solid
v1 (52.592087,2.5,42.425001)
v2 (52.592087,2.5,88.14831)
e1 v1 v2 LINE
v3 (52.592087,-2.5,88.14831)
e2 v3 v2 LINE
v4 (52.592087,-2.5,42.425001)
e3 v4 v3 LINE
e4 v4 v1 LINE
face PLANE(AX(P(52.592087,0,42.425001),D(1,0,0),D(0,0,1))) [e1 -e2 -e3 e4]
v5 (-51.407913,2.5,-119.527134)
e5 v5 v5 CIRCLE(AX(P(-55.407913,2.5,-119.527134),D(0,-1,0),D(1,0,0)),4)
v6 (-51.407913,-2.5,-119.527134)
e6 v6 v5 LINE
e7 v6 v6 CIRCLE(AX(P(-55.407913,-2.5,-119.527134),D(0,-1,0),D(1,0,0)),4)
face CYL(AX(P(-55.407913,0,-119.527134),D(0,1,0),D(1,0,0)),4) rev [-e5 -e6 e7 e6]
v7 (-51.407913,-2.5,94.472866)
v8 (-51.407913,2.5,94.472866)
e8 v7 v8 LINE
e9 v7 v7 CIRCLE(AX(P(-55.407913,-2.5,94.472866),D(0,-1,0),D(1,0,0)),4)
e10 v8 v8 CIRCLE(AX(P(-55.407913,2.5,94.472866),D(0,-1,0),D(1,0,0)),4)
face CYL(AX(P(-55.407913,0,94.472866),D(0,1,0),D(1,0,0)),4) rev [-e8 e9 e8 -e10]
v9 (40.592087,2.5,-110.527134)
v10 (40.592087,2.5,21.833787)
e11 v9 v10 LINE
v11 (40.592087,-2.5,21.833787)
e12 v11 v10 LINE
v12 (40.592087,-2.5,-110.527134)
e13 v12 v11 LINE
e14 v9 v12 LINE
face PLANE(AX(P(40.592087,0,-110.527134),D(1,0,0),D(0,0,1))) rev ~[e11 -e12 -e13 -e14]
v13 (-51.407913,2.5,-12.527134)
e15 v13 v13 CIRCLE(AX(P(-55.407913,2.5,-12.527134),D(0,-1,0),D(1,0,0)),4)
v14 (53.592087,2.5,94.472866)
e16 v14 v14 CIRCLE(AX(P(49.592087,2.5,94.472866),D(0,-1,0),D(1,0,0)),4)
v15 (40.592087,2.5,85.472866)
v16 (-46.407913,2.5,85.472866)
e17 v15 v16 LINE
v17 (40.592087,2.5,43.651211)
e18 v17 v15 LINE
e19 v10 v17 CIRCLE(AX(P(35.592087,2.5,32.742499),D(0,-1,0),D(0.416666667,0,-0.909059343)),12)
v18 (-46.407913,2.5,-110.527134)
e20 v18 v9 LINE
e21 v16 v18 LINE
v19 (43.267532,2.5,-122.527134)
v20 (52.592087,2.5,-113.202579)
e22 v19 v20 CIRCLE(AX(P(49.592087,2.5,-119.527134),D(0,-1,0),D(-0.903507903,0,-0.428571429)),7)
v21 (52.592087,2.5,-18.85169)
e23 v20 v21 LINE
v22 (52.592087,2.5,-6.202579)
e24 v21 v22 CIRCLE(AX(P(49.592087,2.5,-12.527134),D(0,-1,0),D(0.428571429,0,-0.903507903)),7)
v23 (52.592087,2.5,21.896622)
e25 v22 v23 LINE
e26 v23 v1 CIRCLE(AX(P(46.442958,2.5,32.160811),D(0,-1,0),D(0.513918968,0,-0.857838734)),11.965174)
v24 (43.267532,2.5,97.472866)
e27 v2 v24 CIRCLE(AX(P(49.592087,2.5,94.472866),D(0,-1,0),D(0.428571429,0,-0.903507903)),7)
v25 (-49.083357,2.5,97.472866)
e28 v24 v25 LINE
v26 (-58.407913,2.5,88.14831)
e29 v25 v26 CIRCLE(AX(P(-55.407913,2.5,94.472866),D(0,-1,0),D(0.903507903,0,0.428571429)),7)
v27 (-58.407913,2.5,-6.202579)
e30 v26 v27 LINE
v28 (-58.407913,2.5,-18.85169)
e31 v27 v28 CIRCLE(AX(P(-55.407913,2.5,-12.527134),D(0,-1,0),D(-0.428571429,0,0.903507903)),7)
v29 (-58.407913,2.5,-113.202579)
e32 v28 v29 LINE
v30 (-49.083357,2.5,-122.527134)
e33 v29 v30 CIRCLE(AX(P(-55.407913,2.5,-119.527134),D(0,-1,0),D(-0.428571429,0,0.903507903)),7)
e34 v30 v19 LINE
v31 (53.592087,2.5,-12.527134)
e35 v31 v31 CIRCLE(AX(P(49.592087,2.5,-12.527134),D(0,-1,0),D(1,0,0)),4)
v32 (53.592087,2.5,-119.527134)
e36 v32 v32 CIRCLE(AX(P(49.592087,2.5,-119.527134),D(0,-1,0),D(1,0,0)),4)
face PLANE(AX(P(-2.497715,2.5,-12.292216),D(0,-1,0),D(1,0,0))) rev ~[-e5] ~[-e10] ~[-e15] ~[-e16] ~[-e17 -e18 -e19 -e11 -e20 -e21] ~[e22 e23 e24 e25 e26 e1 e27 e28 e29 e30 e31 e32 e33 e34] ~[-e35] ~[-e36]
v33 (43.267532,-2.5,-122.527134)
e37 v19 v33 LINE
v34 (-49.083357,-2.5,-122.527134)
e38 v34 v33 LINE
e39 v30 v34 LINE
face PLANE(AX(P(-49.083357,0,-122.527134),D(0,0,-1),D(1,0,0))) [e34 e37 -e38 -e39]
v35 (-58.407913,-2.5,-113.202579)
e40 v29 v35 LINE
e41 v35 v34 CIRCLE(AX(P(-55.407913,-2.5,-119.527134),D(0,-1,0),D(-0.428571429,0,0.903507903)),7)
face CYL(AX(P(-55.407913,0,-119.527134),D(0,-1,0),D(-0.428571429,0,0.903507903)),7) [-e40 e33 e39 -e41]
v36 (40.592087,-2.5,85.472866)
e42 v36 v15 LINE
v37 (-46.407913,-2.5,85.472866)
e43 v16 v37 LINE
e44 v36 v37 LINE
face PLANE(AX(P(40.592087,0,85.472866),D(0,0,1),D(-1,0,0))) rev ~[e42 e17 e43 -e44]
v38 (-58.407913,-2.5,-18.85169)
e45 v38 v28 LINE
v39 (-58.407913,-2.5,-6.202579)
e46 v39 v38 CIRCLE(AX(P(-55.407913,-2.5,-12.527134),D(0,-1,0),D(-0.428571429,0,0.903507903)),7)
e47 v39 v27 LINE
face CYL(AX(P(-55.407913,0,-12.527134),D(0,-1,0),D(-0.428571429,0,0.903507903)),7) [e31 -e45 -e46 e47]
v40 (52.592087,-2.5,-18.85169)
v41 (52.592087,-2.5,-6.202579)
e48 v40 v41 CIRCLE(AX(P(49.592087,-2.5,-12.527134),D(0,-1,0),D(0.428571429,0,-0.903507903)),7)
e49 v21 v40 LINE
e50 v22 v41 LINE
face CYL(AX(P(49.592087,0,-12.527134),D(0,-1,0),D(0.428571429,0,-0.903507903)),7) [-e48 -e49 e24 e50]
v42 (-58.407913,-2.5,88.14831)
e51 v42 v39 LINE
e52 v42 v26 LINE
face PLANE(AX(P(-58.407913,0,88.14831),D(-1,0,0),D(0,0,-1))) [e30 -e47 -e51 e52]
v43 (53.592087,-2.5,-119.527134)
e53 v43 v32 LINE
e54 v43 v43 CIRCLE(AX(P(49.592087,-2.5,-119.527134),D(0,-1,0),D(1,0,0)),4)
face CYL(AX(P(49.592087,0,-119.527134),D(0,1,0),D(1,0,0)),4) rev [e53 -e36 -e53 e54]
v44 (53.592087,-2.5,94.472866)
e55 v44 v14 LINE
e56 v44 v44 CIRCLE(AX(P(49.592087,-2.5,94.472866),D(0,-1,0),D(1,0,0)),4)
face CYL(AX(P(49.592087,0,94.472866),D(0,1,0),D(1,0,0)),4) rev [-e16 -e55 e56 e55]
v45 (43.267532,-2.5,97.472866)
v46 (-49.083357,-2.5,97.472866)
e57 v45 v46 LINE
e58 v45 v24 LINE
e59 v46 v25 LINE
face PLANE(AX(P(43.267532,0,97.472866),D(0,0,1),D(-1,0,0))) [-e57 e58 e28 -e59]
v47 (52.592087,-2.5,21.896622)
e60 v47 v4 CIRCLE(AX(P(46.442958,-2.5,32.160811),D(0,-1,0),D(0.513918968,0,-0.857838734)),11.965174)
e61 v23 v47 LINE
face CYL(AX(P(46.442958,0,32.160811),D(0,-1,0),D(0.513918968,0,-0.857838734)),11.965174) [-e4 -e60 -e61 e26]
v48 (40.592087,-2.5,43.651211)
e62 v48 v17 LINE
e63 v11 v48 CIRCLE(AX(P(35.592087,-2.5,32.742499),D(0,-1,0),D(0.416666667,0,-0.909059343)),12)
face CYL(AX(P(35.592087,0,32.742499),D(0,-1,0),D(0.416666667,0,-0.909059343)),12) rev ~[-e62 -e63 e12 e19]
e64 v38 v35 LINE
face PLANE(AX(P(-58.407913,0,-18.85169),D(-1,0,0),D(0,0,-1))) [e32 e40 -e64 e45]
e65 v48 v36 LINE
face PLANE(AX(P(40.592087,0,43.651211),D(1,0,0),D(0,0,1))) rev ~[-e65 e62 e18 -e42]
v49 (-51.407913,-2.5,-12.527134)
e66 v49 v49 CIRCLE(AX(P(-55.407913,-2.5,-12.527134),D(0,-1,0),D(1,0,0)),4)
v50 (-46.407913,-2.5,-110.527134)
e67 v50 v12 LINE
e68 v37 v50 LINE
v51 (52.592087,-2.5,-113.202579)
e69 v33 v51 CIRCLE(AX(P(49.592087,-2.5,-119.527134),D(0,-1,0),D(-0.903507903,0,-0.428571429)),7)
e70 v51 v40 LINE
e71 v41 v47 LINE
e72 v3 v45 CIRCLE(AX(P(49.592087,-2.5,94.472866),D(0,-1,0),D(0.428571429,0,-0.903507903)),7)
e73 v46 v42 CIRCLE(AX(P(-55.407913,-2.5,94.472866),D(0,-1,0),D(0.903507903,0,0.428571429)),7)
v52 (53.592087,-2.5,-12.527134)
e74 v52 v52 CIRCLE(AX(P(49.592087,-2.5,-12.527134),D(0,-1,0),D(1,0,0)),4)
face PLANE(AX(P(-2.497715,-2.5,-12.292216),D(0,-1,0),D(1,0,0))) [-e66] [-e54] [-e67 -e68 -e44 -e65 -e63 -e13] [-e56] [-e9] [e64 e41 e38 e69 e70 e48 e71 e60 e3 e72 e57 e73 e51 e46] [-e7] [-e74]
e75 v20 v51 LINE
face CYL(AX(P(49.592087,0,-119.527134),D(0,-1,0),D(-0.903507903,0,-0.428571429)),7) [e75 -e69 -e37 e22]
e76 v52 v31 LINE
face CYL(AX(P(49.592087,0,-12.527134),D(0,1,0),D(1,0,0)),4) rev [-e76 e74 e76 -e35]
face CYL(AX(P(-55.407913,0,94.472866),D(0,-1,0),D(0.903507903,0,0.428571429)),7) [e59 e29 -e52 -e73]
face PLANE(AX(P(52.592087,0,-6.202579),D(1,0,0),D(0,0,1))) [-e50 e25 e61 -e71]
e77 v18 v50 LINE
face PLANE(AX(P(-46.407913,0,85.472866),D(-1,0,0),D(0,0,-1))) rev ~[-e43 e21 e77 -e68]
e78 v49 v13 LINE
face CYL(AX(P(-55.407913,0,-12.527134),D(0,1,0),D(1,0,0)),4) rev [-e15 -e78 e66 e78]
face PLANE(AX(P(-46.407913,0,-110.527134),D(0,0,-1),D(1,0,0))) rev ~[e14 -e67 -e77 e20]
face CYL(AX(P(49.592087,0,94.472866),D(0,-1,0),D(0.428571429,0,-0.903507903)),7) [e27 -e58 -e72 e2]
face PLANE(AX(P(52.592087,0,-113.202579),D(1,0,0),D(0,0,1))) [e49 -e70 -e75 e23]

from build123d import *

# Parameters (mm, degrees)
F0_R     = 4
F1_DEPTH = 2.5
F3_DEPTH = 5


# Not quite as in the source:
# - a feature names something its author has since deleted; it is built from what else it names


with BuildPart() as f1:
    # F0 (on Front) → F1 (new body, symmetric)
    with BuildSketch(Plane.XZ):
        with BuildLine():
            Line((-58.4079127312, -18.8516896643), (-58.4079127312, -113.2025790236))
            ThreePointArc((-58.4079127312, -113.2025790236), (-60.3576601995, -124.4768818123), (-49.0833574108, -122.527134344))
            Line((-49.0833574108, -122.527134344), (43.2675319485, -122.527134344))
            ThreePointArc((43.2675319485, -122.527134344), (54.5418347371, -124.4768818123), (52.5920872688, -113.2025790236))
            Line((52.5920872688, -113.2025790236), (52.5920872688, -18.8516896643))
            ThreePointArc((52.5920872688, -18.8516896643), (56.5920872688, -12.527134344), (52.5920872688, -6.2025790236))
            Line((52.5920872688, -6.2025790236), (52.5920872688, 21.8966218341))
            ThreePointArc((52.5920872688, 21.8966218341), (58.408131243, 32.1608112925), (52.5920872688, 42.425000751))
            Line((52.5920872688, 42.425000751), (52.5920872688, 88.1483103357))
            ThreePointArc((52.5920872688, 88.1483103357), (54.5418347371, 99.4226131243), (43.2675319485, 97.472865656))
            Line((43.2675319485, 97.472865656), (-49.0833574108, 97.472865656))
            ThreePointArc((-49.0833574108, 97.472865656), (-60.3576601995, 99.4226131243), (-58.4079127312, 88.1483103357))
            Line((-58.4079127312, 88.1483103357), (-58.4079127312, -6.2025790236))
            ThreePointArc((-58.4079127312, -6.2025790236), (-62.4079127312, -12.527134344), (-58.4079127312, -18.8516896643))
        make_face()
        with Locations((-55.4079127312, -119.527134344)):
            Circle(F0_R, mode=Mode.SUBTRACT)
        with Locations((49.5920872688, -119.527134344)):
            Circle(F0_R, mode=Mode.SUBTRACT)
        with Locations((-55.4079127312, -12.527134344)):
            Circle(F0_R, mode=Mode.SUBTRACT)
        with Locations((-55.4079127312, 94.472865656)):
            Circle(F0_R, mode=Mode.SUBTRACT)
        with Locations((49.5920872688, -12.527134344)):
            Circle(F0_R, mode=Mode.SUBTRACT)
        with Locations((49.5920872688, 94.472865656)):
            Circle(F0_R, mode=Mode.SUBTRACT)
    extrude(amount=F1_DEPTH, both=True)

    # F2 (on Front) → F3 (cut, symmetric)
    with BuildSketch(Plane.XZ):
        with BuildLine():
            Line((40.5920872688, 85.472865656), (-46.4079127312, 85.472865656))
            Line((-46.4079127312, 85.472865656), (-46.4079127312, -110.527134344))
            Line((-46.4079127312, -110.527134344), (40.5920872688, -110.527134344))
            Line((40.5920872688, -110.527134344), (40.5920872688, 21.8337872246))
            ThreePointArc((40.5920872688, 21.8337872246), (47.5920872688, 32.7424993392), (40.5920872688, 43.6512114539))
            Line((40.5920872688, 43.6512114539), (40.5920872688, 85.472865656))
        make_face()
    extrude(amount=F3_DEPTH, both=True, mode=Mode.SUBTRACT)


solid = f1.part
